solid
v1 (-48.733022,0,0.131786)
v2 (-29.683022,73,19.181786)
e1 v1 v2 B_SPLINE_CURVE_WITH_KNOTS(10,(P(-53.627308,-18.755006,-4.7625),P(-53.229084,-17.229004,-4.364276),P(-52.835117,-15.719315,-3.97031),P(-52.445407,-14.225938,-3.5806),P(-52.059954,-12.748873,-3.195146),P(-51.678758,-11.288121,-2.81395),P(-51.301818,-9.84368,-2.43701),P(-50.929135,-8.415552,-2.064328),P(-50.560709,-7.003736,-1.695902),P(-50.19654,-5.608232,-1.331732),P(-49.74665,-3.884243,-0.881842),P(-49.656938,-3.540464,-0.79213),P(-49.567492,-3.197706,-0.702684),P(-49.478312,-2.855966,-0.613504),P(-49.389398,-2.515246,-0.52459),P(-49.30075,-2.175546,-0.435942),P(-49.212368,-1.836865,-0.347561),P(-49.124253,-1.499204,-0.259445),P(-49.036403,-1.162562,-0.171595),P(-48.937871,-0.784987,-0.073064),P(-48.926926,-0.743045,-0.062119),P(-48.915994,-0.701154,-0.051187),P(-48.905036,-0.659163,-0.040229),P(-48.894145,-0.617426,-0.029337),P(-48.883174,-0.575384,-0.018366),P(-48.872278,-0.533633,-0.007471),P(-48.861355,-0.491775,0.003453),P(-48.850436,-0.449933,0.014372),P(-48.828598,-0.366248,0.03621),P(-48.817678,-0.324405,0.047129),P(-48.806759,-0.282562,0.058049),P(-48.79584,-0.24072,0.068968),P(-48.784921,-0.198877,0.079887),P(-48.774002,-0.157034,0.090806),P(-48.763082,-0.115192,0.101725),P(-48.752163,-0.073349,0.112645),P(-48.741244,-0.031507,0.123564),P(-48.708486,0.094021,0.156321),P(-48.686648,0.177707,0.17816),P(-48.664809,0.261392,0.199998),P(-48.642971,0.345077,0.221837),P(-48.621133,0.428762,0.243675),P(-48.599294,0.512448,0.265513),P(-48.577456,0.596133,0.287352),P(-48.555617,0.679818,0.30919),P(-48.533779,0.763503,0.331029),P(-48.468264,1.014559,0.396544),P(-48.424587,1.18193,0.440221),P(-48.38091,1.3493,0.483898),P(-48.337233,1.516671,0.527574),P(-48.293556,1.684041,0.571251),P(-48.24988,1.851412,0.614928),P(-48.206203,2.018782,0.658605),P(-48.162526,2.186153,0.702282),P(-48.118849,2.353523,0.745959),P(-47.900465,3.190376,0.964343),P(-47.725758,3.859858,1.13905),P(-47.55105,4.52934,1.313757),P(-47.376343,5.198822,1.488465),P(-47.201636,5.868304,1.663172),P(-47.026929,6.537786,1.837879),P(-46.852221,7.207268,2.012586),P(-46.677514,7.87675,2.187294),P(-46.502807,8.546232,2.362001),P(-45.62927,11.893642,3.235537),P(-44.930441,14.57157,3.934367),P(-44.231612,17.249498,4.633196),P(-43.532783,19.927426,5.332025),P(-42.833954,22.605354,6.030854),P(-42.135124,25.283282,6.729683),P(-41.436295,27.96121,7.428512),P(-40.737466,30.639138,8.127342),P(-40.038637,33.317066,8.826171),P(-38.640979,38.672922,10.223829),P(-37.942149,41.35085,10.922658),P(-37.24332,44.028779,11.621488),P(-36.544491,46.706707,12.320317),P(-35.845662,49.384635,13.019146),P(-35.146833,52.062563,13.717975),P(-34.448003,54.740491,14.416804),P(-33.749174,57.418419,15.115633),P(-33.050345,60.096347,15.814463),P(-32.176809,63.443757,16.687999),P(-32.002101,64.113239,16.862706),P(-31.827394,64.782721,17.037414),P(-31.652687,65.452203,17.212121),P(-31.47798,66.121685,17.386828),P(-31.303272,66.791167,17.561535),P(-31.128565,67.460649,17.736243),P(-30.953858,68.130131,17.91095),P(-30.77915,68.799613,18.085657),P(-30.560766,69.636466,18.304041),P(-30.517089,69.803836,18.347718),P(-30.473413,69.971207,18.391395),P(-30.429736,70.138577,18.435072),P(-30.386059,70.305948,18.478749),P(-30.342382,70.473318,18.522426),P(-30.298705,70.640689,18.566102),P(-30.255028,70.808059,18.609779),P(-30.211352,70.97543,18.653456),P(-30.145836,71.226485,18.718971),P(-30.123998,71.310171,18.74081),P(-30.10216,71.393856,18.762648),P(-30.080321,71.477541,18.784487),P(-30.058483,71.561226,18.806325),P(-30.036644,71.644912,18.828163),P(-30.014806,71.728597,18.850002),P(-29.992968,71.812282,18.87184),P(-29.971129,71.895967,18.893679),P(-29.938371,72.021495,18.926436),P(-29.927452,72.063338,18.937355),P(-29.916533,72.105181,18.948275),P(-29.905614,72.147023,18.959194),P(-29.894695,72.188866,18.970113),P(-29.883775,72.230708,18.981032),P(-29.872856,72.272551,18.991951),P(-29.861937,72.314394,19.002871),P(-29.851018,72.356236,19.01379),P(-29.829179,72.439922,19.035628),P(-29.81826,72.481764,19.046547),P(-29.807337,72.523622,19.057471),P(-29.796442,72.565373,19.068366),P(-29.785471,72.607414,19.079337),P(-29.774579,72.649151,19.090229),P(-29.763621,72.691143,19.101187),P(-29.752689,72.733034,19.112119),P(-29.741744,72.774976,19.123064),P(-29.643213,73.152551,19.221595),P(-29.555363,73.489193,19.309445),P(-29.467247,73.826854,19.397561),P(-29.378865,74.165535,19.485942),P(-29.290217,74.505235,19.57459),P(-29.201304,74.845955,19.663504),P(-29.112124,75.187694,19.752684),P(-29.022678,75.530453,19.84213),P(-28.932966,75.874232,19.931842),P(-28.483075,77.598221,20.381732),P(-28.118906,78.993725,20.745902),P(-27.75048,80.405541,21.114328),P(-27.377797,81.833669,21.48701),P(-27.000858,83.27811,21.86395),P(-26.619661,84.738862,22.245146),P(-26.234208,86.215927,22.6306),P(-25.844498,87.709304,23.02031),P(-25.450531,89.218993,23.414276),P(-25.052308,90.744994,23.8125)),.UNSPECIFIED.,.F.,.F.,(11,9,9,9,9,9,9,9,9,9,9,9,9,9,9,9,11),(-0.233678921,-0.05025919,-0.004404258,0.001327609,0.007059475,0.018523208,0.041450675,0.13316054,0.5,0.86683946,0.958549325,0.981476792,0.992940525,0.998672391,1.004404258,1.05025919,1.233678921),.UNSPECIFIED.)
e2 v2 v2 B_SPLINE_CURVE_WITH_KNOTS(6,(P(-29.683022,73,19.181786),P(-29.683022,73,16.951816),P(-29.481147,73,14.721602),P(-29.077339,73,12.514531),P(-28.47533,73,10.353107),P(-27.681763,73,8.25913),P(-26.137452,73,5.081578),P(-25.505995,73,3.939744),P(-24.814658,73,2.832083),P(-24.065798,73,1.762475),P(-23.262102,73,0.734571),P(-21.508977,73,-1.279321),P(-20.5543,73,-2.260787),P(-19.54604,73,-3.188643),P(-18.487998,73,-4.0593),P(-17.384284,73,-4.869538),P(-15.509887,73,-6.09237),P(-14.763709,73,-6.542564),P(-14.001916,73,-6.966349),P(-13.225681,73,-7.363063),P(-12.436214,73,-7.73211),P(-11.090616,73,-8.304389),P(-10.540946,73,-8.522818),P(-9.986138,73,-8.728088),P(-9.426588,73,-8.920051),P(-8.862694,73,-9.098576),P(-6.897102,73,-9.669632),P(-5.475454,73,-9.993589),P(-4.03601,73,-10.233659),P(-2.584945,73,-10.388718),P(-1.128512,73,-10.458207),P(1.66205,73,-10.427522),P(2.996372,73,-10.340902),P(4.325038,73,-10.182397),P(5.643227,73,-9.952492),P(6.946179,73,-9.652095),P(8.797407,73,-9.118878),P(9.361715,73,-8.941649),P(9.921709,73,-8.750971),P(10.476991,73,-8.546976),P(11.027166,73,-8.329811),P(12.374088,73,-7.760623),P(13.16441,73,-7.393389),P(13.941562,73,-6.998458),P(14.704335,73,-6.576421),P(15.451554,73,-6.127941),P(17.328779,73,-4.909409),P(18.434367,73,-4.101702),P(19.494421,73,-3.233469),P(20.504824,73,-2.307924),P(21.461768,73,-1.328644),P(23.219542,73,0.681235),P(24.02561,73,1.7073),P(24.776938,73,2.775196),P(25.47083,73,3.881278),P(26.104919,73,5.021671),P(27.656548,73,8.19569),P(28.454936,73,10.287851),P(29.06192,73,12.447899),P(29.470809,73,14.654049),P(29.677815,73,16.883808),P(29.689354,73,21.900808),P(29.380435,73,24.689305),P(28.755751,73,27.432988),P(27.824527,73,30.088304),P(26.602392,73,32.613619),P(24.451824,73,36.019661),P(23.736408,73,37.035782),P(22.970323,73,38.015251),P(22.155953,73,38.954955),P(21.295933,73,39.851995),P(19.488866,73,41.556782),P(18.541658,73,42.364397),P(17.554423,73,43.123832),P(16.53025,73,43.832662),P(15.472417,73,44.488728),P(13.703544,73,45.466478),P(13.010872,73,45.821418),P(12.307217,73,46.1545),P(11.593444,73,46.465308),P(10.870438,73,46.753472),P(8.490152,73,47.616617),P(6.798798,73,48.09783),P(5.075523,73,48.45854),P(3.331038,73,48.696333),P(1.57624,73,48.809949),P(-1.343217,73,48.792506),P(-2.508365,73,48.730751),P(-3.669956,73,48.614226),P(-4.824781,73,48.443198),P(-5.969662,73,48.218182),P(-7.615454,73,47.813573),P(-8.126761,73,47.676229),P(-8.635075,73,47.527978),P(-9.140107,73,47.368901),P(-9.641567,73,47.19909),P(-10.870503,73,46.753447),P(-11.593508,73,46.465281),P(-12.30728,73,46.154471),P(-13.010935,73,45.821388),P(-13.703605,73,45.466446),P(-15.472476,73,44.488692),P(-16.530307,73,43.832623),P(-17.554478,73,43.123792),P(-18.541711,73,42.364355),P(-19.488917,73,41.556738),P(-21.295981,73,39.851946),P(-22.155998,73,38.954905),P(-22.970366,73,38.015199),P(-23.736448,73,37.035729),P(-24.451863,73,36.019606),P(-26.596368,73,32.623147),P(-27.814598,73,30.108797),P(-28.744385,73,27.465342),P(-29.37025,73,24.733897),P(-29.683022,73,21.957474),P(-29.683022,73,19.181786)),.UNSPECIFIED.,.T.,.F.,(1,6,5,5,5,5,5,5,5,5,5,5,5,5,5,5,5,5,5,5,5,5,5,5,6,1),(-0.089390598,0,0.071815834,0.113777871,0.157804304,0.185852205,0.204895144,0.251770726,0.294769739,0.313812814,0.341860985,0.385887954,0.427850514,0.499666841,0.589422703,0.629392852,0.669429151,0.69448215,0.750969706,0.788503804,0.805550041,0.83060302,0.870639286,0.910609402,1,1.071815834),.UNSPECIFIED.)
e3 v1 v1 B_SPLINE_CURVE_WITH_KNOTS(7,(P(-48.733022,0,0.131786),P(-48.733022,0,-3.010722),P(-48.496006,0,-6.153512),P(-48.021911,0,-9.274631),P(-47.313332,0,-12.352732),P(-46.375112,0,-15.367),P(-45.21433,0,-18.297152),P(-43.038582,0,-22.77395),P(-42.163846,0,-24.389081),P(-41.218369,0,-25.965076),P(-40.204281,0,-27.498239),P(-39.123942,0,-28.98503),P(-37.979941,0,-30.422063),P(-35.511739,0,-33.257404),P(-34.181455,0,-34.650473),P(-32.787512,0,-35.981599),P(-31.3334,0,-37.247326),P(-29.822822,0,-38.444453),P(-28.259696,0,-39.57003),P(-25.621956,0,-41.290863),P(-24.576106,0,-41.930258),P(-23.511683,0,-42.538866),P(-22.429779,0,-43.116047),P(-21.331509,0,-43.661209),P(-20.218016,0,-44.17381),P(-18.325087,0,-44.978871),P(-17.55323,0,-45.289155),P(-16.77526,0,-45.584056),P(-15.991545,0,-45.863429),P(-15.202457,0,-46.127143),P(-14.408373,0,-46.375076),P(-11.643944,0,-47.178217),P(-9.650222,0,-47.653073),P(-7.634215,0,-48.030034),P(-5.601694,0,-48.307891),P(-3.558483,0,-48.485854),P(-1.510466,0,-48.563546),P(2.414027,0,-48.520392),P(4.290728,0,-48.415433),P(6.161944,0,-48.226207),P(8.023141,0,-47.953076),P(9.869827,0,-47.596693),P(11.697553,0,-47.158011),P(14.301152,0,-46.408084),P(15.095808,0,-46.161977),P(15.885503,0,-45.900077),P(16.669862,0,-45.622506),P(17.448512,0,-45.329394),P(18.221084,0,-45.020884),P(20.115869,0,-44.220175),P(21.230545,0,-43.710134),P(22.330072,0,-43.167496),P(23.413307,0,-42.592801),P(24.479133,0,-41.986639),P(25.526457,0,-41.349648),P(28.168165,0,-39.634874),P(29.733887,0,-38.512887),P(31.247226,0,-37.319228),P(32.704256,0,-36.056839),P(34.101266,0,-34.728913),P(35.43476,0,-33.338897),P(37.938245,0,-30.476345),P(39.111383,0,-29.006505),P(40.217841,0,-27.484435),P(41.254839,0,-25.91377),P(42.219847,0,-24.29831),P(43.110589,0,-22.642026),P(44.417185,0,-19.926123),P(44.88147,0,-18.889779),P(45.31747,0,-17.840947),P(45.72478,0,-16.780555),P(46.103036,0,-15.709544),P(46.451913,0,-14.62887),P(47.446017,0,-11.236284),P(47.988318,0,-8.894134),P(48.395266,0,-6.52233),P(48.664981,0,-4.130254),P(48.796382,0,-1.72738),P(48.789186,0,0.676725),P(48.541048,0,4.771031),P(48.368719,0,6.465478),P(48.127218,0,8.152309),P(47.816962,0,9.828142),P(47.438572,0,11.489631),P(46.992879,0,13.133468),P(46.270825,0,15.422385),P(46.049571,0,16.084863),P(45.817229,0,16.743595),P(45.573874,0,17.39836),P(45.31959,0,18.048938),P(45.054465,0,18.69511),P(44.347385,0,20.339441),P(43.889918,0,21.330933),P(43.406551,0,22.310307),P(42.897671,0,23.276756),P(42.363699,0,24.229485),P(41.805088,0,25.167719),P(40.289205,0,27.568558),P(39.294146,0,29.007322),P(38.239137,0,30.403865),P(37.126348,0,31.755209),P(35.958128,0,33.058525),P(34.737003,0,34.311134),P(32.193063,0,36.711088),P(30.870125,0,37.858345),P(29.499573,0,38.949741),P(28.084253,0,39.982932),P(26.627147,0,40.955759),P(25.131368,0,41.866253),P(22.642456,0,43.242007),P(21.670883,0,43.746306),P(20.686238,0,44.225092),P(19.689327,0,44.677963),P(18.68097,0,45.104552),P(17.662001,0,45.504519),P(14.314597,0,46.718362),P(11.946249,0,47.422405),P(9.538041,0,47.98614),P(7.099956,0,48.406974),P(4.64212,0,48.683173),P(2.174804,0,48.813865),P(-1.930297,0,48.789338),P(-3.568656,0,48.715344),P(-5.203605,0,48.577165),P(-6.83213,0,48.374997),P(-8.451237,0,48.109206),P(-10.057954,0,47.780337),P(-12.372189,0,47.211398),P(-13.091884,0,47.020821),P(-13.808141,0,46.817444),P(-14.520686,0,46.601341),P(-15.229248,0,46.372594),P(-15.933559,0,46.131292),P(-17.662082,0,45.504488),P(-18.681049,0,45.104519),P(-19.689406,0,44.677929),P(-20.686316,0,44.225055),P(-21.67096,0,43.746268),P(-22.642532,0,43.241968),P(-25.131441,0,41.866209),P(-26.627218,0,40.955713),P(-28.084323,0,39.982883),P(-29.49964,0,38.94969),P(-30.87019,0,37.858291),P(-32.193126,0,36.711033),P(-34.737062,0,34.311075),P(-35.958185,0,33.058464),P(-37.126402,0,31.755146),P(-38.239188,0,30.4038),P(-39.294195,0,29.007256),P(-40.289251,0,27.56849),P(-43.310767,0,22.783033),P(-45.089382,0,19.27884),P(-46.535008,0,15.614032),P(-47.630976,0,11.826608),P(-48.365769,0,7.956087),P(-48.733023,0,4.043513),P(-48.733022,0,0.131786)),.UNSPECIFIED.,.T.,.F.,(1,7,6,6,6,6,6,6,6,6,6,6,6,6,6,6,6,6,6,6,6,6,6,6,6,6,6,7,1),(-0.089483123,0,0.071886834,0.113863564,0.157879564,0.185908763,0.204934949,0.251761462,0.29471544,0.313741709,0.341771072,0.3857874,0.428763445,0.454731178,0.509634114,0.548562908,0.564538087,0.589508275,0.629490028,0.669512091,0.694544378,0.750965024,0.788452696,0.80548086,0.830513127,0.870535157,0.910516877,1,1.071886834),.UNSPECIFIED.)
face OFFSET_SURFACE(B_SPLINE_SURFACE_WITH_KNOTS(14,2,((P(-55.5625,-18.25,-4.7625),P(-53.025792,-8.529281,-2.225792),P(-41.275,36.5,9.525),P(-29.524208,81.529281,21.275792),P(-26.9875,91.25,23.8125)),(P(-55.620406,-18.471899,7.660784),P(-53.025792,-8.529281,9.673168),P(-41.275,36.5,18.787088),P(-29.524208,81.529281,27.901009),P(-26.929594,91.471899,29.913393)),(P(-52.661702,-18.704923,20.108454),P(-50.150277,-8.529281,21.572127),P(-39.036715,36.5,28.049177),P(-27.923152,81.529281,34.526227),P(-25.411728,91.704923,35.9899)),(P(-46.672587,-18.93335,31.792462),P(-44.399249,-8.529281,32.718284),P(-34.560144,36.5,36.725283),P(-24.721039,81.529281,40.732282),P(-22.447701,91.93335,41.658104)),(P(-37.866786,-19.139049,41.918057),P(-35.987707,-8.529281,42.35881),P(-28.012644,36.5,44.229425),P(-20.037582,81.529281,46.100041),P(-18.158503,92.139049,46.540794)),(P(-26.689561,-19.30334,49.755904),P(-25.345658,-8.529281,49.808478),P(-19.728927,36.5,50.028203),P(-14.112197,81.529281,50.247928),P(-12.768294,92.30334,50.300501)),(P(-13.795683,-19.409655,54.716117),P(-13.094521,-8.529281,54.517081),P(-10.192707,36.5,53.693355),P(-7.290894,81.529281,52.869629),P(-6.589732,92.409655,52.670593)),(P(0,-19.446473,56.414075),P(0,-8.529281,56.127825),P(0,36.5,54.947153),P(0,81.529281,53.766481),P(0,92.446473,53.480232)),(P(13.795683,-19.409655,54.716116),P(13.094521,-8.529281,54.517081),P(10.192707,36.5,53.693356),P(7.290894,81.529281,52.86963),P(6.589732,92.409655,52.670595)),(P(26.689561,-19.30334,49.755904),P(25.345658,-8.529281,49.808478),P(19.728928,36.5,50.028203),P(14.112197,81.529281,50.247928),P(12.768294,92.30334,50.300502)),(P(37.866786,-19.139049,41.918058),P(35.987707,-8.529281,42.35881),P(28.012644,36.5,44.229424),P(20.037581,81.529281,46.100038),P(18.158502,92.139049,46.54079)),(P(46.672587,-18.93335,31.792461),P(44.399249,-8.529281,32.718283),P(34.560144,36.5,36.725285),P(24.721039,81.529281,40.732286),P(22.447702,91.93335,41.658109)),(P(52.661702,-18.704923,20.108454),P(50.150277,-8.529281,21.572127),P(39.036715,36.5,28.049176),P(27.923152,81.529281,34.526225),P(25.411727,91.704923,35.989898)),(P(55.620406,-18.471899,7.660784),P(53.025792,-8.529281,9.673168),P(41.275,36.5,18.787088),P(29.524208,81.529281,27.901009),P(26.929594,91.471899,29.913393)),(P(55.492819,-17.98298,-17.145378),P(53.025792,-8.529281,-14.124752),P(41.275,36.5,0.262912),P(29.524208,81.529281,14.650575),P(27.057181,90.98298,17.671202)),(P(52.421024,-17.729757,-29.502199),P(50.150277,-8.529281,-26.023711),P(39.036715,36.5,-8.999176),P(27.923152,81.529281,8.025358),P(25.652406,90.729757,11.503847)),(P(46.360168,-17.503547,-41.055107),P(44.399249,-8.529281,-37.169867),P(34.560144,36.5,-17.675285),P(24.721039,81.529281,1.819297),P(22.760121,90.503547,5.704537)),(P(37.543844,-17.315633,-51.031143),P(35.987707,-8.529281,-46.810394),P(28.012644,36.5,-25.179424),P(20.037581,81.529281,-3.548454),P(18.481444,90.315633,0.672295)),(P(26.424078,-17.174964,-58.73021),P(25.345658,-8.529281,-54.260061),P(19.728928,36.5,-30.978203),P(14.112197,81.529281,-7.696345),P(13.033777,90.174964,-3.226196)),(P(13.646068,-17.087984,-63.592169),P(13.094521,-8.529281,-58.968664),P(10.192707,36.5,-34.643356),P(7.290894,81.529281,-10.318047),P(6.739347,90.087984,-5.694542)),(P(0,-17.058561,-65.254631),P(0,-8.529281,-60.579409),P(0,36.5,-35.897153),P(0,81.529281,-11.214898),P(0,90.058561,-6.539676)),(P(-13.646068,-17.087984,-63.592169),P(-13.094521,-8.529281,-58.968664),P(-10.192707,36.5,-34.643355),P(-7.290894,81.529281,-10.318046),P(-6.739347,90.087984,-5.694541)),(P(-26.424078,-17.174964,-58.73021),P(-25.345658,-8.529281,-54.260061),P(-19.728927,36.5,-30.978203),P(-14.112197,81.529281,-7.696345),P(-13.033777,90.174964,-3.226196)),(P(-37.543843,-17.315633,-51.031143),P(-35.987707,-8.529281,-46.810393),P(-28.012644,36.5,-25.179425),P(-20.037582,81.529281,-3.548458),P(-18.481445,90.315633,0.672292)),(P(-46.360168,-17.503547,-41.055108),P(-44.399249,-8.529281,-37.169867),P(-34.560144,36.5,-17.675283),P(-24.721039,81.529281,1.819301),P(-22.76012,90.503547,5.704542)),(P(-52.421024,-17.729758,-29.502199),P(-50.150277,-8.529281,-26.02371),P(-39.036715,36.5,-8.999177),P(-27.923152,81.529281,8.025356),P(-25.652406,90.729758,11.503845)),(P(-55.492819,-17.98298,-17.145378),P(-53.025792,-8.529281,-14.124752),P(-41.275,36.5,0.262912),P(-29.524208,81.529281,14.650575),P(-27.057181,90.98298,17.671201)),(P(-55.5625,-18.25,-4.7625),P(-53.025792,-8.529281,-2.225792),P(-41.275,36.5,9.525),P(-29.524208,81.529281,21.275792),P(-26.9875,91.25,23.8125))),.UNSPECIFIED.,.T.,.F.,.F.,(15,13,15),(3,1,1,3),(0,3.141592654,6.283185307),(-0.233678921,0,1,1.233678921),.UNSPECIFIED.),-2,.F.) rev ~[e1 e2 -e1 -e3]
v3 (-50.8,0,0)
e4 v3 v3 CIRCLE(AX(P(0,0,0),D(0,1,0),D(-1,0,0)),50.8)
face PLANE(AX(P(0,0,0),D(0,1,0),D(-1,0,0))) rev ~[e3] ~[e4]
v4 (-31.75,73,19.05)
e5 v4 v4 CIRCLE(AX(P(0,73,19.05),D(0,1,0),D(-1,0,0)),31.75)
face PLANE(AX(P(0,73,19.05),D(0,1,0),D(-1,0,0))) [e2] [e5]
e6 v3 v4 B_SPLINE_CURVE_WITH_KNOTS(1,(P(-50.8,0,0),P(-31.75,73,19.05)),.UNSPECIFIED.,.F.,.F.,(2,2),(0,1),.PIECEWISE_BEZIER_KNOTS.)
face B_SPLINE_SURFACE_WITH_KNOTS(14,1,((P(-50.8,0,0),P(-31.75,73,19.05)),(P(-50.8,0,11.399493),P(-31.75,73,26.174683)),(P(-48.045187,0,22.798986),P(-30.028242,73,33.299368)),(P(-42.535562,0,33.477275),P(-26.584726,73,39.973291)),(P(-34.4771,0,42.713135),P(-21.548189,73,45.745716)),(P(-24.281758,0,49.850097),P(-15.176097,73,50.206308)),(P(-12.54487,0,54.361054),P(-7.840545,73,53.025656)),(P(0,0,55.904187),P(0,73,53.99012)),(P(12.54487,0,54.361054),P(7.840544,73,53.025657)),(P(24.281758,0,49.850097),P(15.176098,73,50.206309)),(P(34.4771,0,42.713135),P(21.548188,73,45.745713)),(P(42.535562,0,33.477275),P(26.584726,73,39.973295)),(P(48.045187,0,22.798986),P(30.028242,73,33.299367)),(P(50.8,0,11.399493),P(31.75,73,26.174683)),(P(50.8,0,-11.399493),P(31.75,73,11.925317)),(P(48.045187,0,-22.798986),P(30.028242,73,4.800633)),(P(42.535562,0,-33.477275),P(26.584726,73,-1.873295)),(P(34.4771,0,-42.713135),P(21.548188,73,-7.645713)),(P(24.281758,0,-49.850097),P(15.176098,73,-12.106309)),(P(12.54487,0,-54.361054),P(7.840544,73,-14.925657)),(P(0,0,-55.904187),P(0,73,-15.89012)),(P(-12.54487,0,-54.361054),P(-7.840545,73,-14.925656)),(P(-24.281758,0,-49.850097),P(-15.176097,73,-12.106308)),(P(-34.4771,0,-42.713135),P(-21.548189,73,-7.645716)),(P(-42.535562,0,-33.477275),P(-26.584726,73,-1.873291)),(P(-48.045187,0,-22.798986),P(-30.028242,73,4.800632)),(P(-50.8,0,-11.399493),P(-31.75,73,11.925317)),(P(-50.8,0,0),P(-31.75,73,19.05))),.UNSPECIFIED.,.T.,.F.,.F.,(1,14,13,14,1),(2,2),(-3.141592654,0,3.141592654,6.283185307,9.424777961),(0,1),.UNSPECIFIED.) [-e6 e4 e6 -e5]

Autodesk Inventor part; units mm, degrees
ref_plane "YZ Plane" through (0, 0, 0) normal (1, 0, 0) x (0, 1, 0)
ref_plane "XY Plane" through (0, 0, 0) normal (0, 0, 1) x (1, 0, 0)
sketch "Szkic6" plane through (0, 0, 0) normal (0, 1, 0) x (-1, 0, 0)
  circle A0 centre (0, 0) radius 50.8
  dimension "d33" = 101.6
ref_plane "Płaszczyzna konstrukcyjna1" through (0, 73, 0) normal (0, 1, 0) x (-1, 0, 0)
sketch "Szkic7" plane through (0, 73, 0) normal (0, 1, 0) x (-1, 0, 0)
  circle A0 centre (0, 19.05) radius 31.75
  line L0 (0, -20.3) -> (0, 20.3) construction
  circle A1 centre (0, 0) radius 50.8 construction
  dimension "d35" = 63.5
loft "Wyciągnięcie złożone1" add profiles "Szkic6", "Szkic7"
shell "Skorupa1" thickness 2 removed faces 2 at (14.3997, 73, 24.5789) at (7.3018, 0, 11.5135)
equation "\"d33\" = OD1"
equation "\"d35\" = OD2"
equation "\"d52\" = THK"
equation "\"SzerokośćGięciaPodcięcia\" = Grubość"
equation "\"RozmiarPodcięciaNarożnika\" = 4 * Grubość"
equation "\"PromieńPrzejścia\" = PromieńGięcia"
equation "\"Rozmiar_promienia_Jacobiego\" = PromieńGięcia"
equation "\"Wielk_odstępu\" = Grubość"
equation "\"d2\" = PromieńGięcia"
equation "\"d23\" = PromieńGięcia"
equation "\"OD1\" = 101.6"
equation "\"OD2\" = 63.5"
equation "\"L\" = 73"
equation "\"THK\" = 2"
equation "\"d34\" = L"
equation "\"Grubość\" = 1.5"
equation "\"PromieńGięcia\" = 3"
properties part number "Redukcja asymetryczna Ø101,6x63,5x2 L=73" material "304"
